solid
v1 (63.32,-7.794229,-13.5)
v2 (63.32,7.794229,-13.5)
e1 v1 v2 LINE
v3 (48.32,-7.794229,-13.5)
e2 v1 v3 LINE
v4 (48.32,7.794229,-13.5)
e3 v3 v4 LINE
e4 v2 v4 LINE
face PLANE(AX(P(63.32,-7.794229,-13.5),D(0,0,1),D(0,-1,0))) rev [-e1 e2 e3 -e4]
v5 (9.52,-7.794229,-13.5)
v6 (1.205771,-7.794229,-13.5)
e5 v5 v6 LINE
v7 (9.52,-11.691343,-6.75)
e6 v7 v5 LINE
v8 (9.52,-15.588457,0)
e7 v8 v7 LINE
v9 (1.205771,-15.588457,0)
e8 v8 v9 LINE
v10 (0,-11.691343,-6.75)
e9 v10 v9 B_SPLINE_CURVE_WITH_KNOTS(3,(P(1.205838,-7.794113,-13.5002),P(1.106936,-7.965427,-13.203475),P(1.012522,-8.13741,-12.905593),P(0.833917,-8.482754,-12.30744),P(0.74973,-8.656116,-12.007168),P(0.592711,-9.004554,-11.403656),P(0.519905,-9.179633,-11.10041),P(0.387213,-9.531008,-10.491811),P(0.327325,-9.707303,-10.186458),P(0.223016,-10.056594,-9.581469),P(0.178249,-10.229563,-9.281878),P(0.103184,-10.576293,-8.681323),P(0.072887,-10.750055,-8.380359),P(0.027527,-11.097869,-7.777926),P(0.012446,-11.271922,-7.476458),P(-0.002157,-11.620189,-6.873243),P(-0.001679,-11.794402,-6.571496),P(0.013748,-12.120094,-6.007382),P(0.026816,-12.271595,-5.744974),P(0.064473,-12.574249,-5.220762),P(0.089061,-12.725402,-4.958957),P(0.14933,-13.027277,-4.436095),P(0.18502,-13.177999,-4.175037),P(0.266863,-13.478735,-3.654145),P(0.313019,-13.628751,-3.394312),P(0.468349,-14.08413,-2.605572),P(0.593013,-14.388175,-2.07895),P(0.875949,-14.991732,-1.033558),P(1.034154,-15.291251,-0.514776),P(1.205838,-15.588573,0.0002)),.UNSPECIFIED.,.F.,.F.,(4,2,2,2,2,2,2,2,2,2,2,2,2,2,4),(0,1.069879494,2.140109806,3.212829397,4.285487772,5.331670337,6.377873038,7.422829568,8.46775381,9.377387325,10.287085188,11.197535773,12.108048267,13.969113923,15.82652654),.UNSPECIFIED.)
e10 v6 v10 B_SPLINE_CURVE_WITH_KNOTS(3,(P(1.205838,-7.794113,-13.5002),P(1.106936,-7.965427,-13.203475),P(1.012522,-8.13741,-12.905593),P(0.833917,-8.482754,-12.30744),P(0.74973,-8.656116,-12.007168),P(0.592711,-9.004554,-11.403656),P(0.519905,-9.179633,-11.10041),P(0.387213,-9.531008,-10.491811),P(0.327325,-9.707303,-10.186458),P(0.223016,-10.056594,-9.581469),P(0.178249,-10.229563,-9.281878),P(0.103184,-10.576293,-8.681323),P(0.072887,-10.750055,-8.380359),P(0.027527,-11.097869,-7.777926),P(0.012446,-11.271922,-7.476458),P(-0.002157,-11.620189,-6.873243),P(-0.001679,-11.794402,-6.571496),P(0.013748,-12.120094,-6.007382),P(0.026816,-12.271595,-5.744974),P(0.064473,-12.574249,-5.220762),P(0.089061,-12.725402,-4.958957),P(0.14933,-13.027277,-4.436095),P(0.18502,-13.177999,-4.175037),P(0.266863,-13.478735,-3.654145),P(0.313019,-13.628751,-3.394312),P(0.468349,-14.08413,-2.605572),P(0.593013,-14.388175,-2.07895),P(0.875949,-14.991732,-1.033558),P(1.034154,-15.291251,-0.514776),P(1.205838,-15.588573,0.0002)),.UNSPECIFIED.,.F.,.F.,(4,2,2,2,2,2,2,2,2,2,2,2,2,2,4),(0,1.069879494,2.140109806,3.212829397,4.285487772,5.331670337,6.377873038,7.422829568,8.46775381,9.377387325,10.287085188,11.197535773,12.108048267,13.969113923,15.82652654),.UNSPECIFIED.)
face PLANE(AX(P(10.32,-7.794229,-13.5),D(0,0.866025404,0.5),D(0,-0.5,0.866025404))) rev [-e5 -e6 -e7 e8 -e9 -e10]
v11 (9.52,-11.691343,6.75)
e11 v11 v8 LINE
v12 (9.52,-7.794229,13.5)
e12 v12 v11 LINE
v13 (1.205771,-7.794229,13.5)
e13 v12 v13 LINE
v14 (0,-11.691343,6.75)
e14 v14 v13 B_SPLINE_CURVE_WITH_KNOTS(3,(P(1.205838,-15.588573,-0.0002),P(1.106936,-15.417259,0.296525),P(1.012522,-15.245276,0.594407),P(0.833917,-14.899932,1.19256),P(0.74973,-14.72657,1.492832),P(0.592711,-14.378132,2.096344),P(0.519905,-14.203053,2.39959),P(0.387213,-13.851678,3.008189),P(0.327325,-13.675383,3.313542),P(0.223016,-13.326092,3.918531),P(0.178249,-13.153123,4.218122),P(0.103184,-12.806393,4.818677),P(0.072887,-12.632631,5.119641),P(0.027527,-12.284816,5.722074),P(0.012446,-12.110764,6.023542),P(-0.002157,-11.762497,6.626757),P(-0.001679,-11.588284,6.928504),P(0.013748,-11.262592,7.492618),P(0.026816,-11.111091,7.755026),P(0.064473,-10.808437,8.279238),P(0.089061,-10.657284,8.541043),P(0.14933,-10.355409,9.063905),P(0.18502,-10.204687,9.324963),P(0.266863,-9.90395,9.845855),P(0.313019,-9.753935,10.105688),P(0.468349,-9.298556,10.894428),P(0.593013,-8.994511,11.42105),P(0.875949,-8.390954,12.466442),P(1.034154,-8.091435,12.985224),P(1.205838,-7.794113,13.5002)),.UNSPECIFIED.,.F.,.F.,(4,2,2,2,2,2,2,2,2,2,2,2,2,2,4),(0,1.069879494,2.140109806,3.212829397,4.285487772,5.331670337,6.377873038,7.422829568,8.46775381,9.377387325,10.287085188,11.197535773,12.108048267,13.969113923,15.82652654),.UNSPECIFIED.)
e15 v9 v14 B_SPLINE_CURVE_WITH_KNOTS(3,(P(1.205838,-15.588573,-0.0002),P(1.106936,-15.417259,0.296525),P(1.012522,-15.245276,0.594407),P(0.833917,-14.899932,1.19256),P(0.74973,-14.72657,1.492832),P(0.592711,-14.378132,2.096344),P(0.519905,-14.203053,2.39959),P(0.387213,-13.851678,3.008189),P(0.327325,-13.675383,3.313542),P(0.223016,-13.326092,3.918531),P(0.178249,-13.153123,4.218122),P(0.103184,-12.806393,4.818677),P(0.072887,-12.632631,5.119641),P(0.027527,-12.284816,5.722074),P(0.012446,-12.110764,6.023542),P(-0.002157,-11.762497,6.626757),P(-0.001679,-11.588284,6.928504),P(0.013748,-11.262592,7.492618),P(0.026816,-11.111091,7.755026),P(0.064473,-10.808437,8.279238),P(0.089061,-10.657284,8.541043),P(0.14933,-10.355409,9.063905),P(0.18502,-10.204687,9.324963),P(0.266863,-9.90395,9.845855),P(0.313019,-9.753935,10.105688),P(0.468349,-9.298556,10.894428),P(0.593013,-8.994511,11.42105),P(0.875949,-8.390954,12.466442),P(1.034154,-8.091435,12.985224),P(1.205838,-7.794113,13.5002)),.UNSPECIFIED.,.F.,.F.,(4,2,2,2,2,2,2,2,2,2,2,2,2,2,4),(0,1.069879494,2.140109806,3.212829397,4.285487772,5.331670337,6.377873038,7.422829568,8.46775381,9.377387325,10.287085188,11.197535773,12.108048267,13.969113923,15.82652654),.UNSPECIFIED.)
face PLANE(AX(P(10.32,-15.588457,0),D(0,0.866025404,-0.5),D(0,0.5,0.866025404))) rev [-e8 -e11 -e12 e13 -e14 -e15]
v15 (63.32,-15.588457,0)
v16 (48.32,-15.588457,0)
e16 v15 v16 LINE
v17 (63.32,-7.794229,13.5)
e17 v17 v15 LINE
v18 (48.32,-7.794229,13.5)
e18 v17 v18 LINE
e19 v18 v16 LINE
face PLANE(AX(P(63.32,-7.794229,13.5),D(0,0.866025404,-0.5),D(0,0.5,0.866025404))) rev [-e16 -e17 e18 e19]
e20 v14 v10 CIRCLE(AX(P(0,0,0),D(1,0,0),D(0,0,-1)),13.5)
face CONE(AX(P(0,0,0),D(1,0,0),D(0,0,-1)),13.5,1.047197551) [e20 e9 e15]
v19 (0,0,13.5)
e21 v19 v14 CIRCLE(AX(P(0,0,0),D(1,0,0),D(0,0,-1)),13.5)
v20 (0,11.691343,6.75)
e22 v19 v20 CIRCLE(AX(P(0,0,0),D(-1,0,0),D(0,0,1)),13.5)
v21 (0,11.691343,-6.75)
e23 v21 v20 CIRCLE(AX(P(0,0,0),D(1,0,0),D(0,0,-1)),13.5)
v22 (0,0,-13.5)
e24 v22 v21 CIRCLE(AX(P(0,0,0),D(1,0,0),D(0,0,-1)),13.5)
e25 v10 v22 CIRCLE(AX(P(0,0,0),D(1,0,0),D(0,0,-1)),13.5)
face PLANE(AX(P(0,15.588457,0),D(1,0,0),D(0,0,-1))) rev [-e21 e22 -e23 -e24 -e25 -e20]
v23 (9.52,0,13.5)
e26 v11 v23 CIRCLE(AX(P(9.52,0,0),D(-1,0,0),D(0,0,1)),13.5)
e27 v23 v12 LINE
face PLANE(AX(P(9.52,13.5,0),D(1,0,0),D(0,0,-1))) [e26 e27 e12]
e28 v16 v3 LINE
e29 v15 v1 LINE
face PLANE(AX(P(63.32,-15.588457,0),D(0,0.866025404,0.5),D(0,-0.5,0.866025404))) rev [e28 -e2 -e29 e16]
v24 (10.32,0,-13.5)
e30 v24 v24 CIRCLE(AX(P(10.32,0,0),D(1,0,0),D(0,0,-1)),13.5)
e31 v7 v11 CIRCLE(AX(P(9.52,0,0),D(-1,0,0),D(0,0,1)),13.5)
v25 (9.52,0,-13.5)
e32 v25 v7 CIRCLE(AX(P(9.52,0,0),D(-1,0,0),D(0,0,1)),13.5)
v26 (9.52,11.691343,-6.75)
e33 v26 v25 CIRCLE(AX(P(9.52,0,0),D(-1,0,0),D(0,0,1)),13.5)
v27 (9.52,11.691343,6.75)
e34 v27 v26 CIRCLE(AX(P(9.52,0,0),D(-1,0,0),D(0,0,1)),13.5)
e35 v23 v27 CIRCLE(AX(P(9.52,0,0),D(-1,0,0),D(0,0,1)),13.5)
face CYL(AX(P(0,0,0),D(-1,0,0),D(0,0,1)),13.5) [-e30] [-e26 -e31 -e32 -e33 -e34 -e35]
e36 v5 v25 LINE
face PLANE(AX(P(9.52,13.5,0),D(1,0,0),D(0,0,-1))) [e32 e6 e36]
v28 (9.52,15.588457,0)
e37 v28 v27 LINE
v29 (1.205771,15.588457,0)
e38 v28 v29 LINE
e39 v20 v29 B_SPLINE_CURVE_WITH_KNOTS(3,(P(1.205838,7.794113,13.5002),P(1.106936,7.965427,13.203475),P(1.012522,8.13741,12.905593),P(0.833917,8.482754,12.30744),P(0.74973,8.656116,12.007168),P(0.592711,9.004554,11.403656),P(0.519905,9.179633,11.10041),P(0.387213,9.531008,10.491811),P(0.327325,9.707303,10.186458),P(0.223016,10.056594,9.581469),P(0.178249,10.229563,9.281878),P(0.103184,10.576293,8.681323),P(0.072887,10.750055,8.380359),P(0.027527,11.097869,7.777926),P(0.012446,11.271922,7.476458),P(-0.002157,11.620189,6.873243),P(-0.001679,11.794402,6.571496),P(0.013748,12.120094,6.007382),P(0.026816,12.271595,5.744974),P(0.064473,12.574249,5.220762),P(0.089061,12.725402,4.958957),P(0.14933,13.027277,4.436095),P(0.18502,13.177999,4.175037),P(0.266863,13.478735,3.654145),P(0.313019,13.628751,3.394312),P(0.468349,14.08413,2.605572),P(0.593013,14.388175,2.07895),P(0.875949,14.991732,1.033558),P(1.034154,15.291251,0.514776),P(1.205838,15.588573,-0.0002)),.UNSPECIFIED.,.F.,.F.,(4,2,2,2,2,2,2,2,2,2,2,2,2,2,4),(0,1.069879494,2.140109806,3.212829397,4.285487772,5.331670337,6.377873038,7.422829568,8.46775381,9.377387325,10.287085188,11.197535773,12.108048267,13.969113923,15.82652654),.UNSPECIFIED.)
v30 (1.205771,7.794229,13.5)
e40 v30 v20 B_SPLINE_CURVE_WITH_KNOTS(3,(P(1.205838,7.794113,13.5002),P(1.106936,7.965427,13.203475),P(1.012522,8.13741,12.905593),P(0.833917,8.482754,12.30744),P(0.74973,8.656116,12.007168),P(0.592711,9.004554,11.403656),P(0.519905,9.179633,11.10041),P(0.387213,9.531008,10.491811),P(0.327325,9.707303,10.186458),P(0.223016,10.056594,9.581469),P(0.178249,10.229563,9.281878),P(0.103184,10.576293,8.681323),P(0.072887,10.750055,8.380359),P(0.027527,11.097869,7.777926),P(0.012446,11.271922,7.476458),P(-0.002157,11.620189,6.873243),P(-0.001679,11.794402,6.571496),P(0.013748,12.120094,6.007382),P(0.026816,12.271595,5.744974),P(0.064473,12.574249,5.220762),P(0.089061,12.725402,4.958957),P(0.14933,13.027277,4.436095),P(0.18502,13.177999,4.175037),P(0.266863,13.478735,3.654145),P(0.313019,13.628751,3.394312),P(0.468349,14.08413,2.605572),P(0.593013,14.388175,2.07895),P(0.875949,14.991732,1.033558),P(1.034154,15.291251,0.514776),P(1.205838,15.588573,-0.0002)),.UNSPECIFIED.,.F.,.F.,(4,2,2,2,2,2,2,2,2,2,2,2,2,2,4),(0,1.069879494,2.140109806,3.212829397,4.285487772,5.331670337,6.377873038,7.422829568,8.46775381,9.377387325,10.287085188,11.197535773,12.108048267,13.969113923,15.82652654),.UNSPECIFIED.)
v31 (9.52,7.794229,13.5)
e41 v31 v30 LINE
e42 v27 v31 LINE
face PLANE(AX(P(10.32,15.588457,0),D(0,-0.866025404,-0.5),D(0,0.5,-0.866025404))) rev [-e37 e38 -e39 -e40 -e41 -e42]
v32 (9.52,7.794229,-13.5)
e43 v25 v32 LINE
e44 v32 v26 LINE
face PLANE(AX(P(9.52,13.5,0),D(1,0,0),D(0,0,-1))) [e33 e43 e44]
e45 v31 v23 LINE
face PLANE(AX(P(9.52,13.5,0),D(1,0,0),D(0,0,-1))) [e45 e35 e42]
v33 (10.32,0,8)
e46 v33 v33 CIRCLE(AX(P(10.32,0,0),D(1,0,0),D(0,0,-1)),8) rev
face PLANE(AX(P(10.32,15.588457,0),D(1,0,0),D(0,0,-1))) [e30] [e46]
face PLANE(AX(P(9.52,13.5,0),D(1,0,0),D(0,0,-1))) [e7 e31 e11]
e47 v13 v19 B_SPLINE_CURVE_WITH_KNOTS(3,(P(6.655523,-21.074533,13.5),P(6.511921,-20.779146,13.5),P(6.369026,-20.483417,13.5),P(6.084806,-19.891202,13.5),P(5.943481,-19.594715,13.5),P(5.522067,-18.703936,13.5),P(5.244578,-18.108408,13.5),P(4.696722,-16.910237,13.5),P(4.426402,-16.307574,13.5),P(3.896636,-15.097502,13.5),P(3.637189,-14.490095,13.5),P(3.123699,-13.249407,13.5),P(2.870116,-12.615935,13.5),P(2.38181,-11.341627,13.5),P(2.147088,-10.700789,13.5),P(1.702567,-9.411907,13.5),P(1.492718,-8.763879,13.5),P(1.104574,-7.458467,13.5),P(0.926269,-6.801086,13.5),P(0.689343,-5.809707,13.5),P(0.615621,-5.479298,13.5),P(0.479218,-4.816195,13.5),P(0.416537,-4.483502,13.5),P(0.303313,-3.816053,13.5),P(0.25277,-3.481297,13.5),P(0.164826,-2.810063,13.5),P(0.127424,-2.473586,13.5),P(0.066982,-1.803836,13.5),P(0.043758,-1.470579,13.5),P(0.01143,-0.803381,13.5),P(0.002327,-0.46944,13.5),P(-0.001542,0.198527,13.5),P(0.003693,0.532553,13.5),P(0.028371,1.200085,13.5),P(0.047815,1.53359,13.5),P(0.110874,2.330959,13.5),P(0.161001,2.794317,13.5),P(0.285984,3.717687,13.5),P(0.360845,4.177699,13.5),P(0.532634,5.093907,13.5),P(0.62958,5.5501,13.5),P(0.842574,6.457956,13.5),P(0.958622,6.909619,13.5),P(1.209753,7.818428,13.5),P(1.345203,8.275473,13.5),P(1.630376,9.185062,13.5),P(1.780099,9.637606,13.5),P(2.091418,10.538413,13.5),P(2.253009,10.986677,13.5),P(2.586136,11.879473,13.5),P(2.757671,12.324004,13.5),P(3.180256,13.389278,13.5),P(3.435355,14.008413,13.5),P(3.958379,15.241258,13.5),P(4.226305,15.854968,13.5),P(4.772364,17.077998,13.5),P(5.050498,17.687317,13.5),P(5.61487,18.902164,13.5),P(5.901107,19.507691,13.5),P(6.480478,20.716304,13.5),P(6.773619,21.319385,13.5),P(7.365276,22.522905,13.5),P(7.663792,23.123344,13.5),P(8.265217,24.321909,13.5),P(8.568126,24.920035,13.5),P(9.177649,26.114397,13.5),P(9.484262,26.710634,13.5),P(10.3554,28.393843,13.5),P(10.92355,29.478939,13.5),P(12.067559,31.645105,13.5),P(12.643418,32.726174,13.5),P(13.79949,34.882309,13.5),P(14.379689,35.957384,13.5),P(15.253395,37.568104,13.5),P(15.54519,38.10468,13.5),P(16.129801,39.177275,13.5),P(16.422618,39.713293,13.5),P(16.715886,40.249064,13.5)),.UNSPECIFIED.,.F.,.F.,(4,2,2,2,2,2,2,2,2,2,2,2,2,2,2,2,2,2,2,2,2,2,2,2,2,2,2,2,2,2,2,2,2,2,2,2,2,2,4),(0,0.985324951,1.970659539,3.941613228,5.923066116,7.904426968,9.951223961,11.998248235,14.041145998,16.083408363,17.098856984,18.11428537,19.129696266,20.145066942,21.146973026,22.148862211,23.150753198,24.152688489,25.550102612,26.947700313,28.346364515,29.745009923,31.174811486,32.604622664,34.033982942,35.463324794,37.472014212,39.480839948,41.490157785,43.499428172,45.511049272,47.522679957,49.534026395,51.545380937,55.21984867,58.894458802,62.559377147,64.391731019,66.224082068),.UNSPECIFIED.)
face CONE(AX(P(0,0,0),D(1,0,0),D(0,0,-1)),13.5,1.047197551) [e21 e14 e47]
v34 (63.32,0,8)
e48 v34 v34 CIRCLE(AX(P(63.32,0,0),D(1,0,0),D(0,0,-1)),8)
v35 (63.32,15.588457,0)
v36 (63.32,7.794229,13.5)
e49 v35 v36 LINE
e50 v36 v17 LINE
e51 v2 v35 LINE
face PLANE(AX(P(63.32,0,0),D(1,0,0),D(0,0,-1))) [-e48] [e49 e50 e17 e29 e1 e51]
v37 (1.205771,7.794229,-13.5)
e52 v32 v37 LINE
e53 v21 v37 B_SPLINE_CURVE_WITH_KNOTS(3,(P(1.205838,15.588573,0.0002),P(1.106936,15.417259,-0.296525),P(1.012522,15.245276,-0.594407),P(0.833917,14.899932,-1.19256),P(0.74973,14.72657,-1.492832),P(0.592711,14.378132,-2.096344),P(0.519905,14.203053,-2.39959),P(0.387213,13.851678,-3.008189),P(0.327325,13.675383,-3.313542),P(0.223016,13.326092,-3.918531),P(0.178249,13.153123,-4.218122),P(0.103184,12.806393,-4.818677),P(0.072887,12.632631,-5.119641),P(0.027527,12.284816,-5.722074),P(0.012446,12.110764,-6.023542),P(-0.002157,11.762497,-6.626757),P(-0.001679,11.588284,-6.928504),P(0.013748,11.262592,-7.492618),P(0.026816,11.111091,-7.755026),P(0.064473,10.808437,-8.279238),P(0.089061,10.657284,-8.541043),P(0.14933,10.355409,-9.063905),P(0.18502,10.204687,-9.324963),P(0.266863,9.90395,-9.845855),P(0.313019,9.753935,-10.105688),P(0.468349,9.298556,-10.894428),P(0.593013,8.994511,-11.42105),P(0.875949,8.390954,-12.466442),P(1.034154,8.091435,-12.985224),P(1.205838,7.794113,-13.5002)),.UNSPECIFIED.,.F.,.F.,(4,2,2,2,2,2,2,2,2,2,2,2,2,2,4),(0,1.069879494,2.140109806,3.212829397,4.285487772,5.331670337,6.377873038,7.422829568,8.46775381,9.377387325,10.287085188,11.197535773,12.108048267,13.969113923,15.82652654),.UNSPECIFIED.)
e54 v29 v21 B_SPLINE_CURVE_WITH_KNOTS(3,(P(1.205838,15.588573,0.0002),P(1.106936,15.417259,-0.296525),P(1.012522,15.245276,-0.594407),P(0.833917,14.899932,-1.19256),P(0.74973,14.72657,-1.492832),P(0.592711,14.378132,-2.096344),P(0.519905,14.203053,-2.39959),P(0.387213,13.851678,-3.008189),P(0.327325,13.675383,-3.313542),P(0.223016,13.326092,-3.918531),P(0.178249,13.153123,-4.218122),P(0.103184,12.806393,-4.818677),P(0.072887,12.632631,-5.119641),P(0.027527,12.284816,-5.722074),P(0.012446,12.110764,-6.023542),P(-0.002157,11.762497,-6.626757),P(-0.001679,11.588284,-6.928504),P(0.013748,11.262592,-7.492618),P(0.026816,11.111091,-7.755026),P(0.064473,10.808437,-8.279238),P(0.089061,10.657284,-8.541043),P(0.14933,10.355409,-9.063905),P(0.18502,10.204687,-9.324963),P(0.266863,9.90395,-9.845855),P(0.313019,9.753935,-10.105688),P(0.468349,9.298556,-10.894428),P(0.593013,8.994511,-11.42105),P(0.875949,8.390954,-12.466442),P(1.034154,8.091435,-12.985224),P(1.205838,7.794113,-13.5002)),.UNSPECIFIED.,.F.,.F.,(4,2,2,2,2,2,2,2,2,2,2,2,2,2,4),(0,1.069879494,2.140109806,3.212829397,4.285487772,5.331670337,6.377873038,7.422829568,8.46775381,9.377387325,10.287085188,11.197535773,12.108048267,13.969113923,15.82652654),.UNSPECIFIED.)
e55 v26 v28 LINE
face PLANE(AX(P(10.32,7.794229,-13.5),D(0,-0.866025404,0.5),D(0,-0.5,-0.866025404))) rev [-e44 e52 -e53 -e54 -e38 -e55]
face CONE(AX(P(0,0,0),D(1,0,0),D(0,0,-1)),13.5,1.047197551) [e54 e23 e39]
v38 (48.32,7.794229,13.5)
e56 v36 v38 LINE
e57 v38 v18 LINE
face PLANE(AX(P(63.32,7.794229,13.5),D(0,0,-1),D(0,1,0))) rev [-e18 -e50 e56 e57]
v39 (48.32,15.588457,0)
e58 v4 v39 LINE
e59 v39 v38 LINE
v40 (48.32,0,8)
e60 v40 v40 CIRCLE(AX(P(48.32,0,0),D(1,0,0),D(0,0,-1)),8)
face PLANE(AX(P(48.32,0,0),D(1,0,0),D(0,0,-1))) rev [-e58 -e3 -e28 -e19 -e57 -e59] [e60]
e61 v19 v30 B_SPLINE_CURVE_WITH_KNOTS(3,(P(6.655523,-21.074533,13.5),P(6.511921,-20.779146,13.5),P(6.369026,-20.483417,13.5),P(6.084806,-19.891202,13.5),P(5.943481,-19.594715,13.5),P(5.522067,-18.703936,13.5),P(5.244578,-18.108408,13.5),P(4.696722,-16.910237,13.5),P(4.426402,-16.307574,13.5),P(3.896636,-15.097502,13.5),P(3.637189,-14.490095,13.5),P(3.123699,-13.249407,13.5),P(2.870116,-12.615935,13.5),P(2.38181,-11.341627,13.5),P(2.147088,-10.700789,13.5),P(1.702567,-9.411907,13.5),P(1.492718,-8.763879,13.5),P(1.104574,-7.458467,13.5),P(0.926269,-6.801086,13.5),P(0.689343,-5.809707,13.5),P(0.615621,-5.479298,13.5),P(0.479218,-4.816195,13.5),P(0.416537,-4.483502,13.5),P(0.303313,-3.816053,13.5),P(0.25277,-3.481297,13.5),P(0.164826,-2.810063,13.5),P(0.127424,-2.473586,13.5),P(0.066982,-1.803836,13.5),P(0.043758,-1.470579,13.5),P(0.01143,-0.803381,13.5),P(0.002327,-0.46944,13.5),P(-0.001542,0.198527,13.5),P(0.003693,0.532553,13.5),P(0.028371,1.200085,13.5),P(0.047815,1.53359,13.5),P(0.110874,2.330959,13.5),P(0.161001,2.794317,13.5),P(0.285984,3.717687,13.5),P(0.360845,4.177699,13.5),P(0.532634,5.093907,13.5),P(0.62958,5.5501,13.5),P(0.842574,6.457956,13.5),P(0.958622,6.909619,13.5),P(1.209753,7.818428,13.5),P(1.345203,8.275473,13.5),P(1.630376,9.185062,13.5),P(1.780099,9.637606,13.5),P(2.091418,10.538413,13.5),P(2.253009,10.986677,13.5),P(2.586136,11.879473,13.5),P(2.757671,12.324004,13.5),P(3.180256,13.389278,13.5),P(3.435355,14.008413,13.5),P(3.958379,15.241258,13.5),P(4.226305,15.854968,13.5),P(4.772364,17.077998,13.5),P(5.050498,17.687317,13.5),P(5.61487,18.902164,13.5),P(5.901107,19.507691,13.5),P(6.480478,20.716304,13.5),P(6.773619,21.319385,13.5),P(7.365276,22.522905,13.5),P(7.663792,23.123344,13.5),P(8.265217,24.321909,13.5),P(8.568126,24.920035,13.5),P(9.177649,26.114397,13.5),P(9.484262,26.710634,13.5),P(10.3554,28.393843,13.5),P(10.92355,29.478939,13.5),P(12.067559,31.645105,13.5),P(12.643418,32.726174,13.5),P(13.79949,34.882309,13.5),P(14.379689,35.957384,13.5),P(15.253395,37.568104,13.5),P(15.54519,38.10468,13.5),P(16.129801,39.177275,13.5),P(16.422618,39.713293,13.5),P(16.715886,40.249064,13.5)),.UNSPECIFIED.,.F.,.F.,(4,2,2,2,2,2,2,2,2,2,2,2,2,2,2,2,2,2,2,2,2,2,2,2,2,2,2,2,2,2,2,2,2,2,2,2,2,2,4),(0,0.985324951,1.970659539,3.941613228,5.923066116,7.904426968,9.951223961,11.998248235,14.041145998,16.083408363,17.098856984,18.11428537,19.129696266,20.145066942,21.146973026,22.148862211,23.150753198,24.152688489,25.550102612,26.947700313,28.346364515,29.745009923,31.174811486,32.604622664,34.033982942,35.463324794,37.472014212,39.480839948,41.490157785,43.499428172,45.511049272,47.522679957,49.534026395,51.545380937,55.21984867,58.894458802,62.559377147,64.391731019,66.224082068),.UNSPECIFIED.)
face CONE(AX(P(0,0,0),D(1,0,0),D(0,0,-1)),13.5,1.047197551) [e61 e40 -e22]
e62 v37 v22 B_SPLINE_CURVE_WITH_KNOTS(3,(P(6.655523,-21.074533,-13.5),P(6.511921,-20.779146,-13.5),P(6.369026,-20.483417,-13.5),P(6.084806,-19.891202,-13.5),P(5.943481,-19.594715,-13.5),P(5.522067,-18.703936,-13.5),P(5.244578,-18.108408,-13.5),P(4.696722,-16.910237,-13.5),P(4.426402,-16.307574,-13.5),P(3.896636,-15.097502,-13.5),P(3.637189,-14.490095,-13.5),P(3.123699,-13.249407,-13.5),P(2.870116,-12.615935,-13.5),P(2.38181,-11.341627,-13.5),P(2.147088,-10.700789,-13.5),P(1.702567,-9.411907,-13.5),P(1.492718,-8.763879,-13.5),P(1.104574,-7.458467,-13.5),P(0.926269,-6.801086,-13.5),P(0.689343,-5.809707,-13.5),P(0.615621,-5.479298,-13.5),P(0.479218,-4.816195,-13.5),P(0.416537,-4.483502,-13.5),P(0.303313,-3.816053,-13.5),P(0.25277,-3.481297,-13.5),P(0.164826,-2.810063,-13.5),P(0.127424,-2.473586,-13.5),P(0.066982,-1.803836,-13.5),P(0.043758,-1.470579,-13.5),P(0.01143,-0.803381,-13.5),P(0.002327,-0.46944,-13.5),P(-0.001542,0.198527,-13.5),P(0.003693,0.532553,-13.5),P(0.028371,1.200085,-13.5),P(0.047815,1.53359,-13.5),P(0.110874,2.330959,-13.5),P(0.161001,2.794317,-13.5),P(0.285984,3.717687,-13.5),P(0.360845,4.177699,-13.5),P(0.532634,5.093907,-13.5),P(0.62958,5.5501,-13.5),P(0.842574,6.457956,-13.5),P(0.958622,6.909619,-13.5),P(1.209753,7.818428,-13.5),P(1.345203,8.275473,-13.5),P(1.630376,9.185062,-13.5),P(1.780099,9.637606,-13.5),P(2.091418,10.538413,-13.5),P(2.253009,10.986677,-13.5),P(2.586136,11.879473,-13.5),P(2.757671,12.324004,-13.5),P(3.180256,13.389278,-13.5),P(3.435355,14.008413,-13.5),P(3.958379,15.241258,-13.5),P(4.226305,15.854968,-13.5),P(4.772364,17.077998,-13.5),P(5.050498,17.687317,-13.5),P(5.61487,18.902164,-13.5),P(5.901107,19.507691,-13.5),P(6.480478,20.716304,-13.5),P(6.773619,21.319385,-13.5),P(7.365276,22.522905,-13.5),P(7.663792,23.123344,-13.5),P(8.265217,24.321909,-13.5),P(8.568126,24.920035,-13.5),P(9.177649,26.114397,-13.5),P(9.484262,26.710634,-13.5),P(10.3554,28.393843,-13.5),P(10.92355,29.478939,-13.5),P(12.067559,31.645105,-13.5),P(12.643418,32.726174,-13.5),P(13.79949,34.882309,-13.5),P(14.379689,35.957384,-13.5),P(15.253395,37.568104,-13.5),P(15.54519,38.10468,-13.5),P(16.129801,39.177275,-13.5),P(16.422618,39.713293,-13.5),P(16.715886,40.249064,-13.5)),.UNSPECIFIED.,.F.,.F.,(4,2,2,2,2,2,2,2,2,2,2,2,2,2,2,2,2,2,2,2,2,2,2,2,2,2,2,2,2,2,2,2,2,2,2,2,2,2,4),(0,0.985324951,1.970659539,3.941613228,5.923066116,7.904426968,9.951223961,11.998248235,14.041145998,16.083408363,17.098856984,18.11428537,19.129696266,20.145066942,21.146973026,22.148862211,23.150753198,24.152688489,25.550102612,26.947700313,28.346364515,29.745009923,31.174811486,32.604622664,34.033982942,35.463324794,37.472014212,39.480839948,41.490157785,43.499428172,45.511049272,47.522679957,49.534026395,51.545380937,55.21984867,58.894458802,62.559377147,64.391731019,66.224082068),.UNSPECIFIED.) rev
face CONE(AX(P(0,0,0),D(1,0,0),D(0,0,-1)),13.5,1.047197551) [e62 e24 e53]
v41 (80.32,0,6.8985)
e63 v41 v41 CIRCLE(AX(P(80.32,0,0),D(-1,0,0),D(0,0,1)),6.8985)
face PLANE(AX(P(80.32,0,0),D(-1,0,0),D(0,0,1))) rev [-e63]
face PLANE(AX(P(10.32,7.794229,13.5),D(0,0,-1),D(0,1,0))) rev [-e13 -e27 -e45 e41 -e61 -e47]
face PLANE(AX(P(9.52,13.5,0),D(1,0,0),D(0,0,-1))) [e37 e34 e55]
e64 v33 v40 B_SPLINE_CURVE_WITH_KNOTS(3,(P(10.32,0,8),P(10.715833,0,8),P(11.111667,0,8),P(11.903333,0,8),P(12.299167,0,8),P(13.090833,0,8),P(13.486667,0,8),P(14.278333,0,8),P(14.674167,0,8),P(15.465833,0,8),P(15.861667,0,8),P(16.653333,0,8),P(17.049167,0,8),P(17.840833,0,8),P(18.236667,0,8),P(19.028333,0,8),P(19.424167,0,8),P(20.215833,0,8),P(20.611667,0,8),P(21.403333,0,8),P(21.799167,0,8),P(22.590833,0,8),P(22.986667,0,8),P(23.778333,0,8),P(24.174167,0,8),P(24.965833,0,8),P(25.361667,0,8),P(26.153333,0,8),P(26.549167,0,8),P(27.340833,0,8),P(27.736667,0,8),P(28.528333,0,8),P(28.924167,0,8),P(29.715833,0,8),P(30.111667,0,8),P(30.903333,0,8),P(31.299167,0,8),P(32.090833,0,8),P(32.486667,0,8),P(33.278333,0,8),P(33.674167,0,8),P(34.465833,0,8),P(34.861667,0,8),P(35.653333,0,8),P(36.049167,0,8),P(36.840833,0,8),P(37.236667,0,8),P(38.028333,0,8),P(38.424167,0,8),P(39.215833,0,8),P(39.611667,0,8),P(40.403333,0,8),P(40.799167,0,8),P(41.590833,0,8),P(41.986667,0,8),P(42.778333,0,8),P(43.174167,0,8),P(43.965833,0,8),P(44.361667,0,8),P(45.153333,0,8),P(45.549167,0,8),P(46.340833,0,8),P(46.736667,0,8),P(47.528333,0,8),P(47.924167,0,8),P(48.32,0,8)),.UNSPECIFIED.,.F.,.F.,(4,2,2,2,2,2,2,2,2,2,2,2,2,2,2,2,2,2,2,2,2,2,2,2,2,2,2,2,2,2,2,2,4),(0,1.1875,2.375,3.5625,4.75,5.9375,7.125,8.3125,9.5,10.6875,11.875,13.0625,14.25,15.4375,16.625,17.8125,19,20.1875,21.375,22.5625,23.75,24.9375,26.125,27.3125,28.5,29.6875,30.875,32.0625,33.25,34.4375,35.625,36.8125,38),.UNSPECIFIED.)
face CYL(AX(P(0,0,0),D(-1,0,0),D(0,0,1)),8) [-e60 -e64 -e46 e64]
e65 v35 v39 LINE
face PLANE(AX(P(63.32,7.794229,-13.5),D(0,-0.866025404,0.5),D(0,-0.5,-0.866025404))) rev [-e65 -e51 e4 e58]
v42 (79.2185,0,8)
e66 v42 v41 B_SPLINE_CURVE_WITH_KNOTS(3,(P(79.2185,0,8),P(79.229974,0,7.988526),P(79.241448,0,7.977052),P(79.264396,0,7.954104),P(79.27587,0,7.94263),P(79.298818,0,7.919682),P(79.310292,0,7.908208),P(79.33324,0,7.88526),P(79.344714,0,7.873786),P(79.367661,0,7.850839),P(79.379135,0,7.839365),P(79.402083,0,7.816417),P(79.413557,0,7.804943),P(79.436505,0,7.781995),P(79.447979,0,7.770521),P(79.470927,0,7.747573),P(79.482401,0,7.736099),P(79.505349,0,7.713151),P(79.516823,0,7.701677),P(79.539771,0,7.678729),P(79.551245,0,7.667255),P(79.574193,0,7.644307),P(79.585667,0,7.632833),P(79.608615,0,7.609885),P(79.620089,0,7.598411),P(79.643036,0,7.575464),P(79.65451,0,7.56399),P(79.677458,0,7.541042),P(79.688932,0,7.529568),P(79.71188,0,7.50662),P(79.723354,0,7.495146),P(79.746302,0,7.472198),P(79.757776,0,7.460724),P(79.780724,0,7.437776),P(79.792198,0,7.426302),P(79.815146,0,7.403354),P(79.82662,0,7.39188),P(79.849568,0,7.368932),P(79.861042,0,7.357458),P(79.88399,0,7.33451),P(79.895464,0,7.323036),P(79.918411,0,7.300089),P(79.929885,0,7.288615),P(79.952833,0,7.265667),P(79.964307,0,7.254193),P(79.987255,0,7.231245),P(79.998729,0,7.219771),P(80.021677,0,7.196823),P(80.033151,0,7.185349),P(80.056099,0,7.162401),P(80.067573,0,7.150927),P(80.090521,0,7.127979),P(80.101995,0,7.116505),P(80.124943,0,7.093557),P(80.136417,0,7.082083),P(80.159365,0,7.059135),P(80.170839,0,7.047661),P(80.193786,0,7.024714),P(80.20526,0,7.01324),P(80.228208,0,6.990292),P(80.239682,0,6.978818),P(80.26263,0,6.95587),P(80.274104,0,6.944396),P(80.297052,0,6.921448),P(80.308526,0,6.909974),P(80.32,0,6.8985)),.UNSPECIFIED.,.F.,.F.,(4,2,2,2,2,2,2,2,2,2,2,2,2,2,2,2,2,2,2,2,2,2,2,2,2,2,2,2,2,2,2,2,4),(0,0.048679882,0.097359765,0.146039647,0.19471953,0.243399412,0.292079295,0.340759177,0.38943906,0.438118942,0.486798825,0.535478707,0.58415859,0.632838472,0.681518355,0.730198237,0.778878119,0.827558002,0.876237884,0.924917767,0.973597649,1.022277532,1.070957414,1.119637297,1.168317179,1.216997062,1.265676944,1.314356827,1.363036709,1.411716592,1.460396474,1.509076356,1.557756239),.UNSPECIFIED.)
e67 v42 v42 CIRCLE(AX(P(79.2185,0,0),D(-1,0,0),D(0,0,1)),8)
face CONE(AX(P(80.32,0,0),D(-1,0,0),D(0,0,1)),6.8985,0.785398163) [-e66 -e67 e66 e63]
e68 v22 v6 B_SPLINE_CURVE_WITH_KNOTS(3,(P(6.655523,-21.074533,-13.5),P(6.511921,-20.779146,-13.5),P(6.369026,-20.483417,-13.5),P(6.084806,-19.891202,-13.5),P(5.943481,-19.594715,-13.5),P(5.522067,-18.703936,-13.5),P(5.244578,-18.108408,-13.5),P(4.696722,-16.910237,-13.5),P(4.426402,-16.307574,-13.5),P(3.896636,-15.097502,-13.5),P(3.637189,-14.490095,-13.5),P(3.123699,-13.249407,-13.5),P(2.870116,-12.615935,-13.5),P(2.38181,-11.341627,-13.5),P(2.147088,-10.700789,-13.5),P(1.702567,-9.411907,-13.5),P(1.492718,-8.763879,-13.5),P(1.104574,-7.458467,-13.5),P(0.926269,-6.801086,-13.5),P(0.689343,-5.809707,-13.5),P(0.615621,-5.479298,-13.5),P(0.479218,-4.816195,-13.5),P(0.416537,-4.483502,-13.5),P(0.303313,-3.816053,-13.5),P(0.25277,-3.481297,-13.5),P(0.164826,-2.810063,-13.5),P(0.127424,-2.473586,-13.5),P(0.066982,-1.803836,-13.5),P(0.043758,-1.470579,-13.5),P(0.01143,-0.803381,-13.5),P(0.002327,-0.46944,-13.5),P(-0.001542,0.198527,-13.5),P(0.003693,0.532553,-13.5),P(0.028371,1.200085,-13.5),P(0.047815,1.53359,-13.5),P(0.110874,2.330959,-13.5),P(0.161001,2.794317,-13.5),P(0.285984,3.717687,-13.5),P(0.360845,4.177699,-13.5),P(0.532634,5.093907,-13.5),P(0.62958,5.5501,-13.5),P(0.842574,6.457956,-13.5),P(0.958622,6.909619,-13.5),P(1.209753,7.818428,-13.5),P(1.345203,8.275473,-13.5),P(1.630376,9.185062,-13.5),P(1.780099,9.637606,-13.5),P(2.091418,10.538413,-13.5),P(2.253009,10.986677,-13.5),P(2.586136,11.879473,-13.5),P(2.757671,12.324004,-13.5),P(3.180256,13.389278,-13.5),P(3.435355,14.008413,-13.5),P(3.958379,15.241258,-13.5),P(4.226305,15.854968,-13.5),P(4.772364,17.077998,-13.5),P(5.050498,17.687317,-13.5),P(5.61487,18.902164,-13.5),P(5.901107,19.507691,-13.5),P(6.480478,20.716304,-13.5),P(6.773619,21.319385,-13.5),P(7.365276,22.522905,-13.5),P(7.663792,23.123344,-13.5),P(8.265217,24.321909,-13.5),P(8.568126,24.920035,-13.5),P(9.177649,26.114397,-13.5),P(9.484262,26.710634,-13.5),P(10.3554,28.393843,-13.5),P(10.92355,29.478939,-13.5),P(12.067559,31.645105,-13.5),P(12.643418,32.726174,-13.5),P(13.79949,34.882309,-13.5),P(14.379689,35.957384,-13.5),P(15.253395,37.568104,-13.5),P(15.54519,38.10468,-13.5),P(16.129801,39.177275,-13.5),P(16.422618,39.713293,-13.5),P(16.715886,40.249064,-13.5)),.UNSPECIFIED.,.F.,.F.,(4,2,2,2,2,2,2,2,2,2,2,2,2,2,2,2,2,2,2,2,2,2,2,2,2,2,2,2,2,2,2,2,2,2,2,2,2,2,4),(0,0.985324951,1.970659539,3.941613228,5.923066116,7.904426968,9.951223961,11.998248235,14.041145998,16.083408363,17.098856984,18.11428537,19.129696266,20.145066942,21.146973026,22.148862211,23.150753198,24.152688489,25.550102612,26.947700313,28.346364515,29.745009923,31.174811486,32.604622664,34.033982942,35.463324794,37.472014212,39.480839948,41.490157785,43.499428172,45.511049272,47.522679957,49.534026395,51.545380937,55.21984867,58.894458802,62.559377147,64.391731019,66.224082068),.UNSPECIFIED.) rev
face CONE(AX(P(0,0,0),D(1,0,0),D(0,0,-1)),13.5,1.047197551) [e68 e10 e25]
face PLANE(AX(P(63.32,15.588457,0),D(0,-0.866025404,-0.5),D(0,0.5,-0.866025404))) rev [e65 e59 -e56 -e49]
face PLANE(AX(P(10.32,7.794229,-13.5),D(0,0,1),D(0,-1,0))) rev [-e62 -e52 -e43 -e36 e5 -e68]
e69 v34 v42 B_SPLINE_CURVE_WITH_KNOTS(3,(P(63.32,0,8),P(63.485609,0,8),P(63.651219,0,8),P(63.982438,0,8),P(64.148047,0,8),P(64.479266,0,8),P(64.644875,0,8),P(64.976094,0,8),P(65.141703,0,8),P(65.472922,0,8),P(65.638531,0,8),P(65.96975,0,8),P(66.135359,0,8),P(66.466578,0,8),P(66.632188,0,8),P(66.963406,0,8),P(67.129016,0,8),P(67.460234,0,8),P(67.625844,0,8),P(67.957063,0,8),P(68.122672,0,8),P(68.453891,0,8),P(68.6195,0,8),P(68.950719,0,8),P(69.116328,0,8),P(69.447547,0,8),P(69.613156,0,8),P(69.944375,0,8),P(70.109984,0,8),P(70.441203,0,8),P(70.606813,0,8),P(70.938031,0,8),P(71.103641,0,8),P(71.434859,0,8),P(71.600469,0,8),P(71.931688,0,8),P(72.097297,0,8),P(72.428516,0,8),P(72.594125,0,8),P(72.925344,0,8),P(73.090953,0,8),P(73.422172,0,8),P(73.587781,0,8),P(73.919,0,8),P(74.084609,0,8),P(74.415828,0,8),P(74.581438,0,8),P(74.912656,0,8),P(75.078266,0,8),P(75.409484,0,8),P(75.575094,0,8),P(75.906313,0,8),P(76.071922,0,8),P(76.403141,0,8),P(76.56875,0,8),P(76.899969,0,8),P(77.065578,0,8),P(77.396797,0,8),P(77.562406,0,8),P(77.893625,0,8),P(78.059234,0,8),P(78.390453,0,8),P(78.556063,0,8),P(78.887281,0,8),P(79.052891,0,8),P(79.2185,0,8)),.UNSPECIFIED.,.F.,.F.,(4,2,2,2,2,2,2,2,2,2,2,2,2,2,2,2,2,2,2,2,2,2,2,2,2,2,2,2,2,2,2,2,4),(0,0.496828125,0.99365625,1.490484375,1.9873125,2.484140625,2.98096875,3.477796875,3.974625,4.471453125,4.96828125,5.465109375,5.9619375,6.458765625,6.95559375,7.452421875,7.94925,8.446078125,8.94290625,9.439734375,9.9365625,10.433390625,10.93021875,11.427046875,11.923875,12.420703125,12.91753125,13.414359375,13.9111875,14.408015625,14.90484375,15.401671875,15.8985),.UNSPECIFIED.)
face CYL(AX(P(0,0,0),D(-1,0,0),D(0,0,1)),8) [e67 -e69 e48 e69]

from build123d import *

# Parameters (mm, degrees)
BASEHEAD_DEPTH      = 10.32
SKETCH4_W           = 0.8
SKETCH4_H           = 12.088457268
BOSS_EXTRUDE2_DEPTH = 15


# Read off the part's stored shape, not the designer's step: HeadChamfer
with BuildPart() as part:
    # Sketch1 → BaseHead (new body)
    with BuildSketch(Plane(origin=(0, 0, 0), x_dir=(0, 0, -1), z_dir=(1, 0, 0))):
        Polygon((13.5, 7.794228634), (13.5, -7.794228634), (0, -15.588457268), (-13.5, -7.794228634), (-13.5, 7.794228634), (0, 15.588457268), align=None)
    extrude(amount=BASEHEAD_DEPTH)

    # HeadChamfer outline → HeadChamfer (revolve, cut)
    with BuildSketch(Plane.YX):
        Polygon((15.58845727, 1.205771367), (13.499999851, -8.6e-08), (15.58845727, -8.6e-08), align=None)
    revolve(axis=Axis((0, 0, 0), (1, 0, 0)), mode=Mode.SUBTRACT)

    # HeadChamfer 2 outline → HeadChamfer 2 (revolve)
    with BuildSketch(Plane.YX):
        Polygon((8, 10.32), (8, 79.2185), (6.8985, 80.32), (0, 80.32), (0, 10.32), align=None)
    revolve(axis=Axis((0, 0, 0), (1, 0, 0)))

    # Sketch4 → BearingFace (revolve, cut)
    with BuildSketch(Plane.XY, mode=Mode.PRIVATE) as bearingface_sk:
        with Locations((9.92, 19.544228634)):
            Rectangle(SKETCH4_W, SKETCH4_H)
    revolve(bearingface_sk.sketch.rotate(Axis((0, 0, 0), (1, 0, 0)), 90), axis=Axis((0, 0, 0), (1, 0, 0)), mode=Mode.SUBTRACT)

    # Sketch6 → Boss-Extrude2 (add)
    with BuildSketch(Plane(origin=(48.32, 0, 0), x_dir=(0, 0, -1), z_dir=(1, 0, 0))):
        Polygon((0, 15.588457268), (-13.5, 7.794228634), (-13.5, -7.794228634), (0, -15.588457268), (13.5, -7.794228634), (13.5, 7.794228634), align=None)
    extrude(amount=BOSS_EXTRUDE2_DEPTH)


solid = part.part
